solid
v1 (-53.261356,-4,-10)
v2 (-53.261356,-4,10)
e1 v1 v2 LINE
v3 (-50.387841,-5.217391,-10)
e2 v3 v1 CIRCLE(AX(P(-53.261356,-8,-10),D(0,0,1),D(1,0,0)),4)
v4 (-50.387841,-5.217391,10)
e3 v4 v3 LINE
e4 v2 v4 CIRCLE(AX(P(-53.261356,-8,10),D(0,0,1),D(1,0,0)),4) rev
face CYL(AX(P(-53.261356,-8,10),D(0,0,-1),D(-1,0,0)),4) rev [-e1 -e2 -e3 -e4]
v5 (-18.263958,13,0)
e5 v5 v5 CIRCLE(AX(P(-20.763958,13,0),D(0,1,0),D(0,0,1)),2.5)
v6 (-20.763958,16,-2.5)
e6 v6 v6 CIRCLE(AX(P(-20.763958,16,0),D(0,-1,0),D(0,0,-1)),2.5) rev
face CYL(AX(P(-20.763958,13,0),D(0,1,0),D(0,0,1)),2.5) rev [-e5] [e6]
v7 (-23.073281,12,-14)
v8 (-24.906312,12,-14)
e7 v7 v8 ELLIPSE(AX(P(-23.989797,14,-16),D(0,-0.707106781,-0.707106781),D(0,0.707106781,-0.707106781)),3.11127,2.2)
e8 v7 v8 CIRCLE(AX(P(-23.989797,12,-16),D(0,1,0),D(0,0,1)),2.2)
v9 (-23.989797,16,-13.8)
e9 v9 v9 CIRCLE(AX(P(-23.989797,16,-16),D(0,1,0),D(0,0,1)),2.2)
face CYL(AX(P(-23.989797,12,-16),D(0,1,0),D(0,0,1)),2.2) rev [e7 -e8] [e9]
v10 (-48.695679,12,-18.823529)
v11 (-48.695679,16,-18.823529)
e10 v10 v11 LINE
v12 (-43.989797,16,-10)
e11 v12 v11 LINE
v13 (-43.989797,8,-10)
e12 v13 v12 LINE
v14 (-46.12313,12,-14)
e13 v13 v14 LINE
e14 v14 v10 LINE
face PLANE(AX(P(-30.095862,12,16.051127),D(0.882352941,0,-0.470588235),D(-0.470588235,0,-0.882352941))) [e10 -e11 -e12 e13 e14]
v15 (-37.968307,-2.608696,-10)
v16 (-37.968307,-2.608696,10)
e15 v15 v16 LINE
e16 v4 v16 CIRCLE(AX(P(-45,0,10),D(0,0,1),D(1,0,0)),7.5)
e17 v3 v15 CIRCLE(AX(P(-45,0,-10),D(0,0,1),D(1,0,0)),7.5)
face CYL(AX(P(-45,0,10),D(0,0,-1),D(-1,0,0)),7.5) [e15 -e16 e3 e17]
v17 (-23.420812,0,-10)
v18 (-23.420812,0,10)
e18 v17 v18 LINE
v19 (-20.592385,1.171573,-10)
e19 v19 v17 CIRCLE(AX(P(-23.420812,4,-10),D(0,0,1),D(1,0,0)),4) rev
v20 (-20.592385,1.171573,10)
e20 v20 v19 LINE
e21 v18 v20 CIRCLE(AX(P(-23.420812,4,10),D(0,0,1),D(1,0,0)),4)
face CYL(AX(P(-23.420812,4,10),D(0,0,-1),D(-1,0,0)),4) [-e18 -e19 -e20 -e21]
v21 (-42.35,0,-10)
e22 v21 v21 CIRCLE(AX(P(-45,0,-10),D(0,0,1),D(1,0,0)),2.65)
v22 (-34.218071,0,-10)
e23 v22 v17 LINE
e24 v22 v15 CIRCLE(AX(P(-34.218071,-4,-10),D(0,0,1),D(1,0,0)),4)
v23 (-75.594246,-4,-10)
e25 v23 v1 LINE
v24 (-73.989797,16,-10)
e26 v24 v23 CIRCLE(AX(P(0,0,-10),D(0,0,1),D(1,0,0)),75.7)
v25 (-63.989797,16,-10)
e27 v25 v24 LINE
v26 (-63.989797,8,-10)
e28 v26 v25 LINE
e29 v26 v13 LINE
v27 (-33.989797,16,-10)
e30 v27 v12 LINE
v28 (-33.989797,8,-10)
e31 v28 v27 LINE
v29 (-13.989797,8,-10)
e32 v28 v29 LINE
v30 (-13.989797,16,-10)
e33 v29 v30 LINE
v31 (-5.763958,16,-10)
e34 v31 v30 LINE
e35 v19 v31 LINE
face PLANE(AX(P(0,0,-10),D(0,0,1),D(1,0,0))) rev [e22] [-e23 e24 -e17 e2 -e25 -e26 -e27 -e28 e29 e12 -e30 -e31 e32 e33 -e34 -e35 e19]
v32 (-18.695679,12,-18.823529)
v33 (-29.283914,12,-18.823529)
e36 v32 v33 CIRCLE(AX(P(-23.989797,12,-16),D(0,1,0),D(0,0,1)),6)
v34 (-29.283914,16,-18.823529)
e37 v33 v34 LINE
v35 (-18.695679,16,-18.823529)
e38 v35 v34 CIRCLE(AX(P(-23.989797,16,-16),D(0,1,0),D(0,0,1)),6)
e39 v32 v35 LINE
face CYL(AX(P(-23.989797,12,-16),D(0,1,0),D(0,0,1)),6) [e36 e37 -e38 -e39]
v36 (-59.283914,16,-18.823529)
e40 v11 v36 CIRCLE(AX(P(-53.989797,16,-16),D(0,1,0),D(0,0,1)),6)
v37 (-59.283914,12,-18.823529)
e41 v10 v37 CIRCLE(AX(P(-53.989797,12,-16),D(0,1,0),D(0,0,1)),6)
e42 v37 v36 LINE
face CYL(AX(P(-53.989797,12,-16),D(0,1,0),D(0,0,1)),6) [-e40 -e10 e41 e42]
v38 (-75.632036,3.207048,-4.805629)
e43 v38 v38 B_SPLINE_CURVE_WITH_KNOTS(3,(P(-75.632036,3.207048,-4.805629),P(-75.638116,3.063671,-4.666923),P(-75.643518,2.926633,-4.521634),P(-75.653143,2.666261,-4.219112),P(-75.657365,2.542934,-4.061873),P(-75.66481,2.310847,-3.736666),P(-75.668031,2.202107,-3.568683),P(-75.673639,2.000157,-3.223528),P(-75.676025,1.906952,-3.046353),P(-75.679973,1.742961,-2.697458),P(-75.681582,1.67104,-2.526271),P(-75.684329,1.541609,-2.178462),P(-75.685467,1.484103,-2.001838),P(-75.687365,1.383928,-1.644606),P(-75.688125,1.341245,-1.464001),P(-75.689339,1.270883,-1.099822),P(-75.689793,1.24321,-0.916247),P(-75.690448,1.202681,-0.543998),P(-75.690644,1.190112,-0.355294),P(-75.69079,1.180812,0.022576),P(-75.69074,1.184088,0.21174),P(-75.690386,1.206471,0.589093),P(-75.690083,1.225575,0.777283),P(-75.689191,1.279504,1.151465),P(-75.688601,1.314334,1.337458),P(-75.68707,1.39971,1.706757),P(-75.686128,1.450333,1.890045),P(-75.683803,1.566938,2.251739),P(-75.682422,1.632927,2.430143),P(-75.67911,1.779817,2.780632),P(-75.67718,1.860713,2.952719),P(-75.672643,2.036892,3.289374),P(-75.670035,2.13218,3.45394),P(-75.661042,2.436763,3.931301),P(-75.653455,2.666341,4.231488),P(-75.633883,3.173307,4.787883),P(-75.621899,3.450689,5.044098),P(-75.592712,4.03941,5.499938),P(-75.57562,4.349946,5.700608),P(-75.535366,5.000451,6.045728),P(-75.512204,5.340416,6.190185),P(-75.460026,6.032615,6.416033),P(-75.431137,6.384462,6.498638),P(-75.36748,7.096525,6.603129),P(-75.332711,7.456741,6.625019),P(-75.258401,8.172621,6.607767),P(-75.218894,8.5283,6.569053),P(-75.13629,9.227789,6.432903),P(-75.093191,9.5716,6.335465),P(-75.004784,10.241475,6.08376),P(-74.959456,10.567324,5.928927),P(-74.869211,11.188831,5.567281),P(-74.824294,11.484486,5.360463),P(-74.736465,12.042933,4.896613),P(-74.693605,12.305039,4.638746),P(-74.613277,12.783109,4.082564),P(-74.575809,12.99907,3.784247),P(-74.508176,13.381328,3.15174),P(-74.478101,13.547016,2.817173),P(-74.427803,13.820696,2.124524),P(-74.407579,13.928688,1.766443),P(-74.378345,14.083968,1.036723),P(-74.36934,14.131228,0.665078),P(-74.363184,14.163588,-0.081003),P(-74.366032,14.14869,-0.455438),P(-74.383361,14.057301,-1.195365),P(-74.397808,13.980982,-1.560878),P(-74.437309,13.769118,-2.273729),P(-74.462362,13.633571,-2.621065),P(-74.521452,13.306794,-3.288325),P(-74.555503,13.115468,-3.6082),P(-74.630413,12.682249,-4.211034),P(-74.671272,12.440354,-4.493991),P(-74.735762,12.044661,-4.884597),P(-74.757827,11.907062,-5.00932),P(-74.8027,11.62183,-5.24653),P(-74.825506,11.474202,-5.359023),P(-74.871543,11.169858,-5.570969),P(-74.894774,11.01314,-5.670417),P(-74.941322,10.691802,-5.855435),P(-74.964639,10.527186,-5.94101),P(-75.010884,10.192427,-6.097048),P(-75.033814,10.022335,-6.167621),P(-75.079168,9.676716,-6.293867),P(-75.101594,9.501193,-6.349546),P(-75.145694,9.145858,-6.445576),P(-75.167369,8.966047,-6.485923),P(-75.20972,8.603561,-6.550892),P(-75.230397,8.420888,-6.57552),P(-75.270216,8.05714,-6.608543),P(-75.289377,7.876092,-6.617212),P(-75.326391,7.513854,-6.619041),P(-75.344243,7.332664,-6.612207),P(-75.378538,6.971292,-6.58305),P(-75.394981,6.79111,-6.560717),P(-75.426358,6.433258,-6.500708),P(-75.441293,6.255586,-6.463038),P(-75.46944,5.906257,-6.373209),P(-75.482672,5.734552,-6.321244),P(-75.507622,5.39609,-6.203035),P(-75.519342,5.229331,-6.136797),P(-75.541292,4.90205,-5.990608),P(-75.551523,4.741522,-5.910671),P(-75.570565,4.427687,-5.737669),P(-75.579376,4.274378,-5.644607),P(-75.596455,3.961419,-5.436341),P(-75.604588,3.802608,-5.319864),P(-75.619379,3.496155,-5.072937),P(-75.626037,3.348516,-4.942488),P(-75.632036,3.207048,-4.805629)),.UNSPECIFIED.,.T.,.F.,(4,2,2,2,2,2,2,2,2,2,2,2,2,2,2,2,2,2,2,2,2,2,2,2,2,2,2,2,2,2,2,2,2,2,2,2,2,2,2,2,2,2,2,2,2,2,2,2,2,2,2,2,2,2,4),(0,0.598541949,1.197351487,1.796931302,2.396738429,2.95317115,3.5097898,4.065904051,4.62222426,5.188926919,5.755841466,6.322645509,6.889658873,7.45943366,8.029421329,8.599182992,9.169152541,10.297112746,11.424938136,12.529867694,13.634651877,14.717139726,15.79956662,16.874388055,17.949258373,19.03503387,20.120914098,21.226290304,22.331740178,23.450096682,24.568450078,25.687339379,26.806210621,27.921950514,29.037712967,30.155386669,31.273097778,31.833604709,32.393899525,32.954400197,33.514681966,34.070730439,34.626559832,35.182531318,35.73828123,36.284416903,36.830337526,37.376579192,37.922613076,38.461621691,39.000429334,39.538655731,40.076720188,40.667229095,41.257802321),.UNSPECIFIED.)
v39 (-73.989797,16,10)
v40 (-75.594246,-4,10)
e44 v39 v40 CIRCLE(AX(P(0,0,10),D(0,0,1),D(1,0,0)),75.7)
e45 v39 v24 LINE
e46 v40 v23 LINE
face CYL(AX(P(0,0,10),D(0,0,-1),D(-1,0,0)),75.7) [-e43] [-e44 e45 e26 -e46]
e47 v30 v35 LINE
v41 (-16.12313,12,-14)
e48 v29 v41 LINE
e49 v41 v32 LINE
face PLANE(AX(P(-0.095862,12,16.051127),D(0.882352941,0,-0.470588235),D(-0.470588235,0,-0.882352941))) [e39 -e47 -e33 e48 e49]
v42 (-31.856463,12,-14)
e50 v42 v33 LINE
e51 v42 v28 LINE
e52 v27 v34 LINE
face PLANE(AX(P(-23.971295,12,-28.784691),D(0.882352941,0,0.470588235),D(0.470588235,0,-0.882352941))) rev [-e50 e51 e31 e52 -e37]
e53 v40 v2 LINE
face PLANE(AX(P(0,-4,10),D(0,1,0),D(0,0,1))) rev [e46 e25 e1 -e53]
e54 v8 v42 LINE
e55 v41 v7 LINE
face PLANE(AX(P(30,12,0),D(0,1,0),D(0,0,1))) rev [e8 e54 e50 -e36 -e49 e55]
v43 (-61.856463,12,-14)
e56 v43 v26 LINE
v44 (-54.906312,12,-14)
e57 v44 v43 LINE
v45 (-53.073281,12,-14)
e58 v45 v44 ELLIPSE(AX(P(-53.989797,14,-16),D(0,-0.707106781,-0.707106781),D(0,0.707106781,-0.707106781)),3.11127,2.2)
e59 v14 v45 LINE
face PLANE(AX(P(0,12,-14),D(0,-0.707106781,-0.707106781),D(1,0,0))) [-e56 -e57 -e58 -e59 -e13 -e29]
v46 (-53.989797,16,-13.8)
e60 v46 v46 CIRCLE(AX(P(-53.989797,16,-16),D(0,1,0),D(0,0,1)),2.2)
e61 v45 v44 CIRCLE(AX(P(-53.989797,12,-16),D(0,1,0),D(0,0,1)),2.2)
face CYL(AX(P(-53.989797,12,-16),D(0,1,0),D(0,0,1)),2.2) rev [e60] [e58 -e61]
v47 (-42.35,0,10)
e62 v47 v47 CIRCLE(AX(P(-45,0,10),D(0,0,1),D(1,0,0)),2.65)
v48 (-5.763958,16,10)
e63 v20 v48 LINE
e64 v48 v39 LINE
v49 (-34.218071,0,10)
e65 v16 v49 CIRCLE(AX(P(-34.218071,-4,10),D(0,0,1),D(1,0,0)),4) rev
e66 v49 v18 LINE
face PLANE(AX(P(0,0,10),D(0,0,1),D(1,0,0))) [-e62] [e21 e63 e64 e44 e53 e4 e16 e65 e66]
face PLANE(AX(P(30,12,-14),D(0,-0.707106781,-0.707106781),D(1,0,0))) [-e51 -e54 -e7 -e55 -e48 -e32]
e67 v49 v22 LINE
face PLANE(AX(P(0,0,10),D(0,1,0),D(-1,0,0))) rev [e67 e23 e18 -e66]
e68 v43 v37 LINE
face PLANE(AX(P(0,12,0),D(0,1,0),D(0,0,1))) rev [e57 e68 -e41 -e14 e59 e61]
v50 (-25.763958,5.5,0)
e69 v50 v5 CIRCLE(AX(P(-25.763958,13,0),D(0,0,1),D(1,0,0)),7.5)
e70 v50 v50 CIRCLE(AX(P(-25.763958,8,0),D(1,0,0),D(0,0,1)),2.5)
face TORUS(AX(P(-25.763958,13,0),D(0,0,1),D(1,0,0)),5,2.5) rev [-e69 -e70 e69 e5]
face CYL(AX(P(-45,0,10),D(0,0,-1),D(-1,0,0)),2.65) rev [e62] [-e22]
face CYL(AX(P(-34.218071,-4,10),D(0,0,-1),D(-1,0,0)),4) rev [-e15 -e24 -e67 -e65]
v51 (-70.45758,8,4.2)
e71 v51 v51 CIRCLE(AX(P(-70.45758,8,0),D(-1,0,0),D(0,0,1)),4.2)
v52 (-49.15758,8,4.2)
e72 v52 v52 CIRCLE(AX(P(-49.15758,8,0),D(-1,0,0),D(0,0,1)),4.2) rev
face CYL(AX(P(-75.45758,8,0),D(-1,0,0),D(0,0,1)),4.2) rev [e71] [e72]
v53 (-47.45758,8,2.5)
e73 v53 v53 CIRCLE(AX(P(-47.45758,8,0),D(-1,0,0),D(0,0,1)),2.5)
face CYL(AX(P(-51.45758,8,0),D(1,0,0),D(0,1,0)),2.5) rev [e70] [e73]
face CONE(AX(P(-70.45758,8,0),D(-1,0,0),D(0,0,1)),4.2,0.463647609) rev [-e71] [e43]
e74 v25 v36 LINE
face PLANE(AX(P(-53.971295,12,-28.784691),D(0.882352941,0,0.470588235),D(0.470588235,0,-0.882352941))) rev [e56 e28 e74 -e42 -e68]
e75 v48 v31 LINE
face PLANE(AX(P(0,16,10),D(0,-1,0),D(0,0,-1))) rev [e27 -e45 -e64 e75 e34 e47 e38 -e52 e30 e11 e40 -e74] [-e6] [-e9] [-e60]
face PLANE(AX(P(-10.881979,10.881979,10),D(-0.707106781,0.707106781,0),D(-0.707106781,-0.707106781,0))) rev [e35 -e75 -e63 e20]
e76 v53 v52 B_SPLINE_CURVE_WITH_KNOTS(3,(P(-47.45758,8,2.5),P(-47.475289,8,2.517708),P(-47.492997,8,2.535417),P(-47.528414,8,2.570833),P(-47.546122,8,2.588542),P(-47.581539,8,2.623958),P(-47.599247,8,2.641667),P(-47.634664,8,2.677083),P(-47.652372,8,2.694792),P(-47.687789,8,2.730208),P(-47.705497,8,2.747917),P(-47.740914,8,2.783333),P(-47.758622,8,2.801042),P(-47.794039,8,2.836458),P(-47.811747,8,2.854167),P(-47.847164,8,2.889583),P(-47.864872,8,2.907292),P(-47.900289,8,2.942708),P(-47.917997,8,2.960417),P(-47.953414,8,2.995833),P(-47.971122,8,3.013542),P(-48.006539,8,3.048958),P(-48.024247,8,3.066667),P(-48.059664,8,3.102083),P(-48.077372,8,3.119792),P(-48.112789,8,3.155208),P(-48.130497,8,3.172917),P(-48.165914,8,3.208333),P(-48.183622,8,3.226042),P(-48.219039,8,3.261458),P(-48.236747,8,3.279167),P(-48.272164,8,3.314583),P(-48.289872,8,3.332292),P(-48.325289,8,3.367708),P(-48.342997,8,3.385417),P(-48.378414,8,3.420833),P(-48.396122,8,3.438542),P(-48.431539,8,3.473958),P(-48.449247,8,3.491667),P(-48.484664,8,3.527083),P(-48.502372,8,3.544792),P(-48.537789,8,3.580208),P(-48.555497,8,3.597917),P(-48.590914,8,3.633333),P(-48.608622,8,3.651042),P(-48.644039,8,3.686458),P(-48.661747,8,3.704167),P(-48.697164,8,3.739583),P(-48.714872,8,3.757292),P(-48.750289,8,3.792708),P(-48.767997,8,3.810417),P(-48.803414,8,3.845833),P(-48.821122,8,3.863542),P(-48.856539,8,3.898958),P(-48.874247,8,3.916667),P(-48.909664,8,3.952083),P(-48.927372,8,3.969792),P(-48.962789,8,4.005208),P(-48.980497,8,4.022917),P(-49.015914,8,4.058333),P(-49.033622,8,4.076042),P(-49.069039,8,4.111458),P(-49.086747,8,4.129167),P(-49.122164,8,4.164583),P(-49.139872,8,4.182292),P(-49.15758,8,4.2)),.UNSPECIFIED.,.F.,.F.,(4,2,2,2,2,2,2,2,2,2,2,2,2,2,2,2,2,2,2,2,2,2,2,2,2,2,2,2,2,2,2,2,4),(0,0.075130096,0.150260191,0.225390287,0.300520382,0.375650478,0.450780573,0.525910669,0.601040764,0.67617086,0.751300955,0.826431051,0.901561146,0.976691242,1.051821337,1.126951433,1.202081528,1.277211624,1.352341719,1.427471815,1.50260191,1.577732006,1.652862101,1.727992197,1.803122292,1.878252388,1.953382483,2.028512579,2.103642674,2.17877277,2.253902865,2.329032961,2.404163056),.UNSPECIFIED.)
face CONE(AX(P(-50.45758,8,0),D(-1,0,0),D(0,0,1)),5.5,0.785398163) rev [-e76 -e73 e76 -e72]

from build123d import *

# Parameters (mm, degrees)
SKETCH2_R           = 2.65
BOSS_EXTRUDE1_DEPTH = 10
SKETCH5_R           = 2.5
CHAMFER1_SIZE       = 3
FILLET4_R           = 4
SKETCH9_R           = 6
SKETCH9_R_2         = 2.2
BOSS_EXTRUDE2_DEPTH = 4
LPATTERN1_COUNT     = 2
LPATTERN1_PITCH     = 30
CHAMFER2_SIZE       = 4


with BuildPart() as part:
    # Sketch2 → Boss-Extrude1 (new, symmetric)
    with BuildSketch(Plane.XY):
        with BuildLine():
            ThreePointArc((-73.989796594, 16), (-75.457580373, 6.053392794), (-75.594245813, -4))
            Line((-75.594245813, -4), (-51.34428877, -4))
            ThreePointArc((-51.34428877, -4), (-42.918193786, -7.205281597), (-37.5, 0))
            Line((-37.5, 0), (-21.763957799, 0))
            Line((-21.763957799, 0), (-5.763957799, 16))
            Line((-5.763957799, 16), (-73.989796594, 16))
        make_face()
        with Locations((-45, 0)):
            Circle(SKETCH2_R, mode=Mode.SUBTRACT)
    extrude(amount=BOSS_EXTRUDE1_DEPTH, both=True)

    # Sketch3 → Cut-Revolve1 (revolve, cut)
    with BuildSketch(Plane.XY, mode=Mode.PRIVATE) as cut_revolve1_sk:
        Polygon((-76.457580373, 8), (-75.457580373, 8), (-50.457580373, 8), (-50.457580373, 12.2), (-70.457580373, 12.2), (-76.457580373, 12.2), align=None)
        Polygon((-76.457580373, 15.2), (-76.457580373, 12.2), (-70.457580373, 12.2), align=None)
    revolve(cut_revolve1_sk.sketch.rotate(Axis((-75.457580373, 8, 0), (1, 0, 0)), 90), axis=Axis((-75.457580373, 8, 0), (1, 0, 0)), mode=Mode.SUBTRACT)

    # Cut-Sweep2: sweep along a path in Sketch7
    with BuildLine(Plane.XY) as cut_sweep2_path:
        Line((-50.457580373, 8), (-25.763957799, 8))
        ThreePointArc((-25.763957799, 8), (-22.228423893, 9.464466094), (-20.763957799, 13))
        Line((-20.763957799, 13), (-20.763957799, 16))
    # Sketch5 → Cut-Sweep2 (sweep, cut)
    with BuildSketch(Plane(origin=(0, 16, 0), x_dir=(1, 0, 0), z_dir=(0, 1, 0))):
        with Locations((-20.763957799, 0)):
            Circle(SKETCH5_R)
    sweep(path=cut_sweep2_path.line, mode=Mode.SUBTRACT)

    # Chamfer1
    # the kernel refuses this chamfer: 3 mm, written as the material it takes off along each edge
    with BuildSketch(Plane(origin=(-50.457580373, 8, 0), x_dir=(0, -1, 0), z_dir=(0, 0, 1))) as chamfer1_piece_1_section:
        Polygon((2.5 + CHAMFER1_SIZE, 0), (2.5, CHAMFER1_SIZE), (2.5, 0), align=None)
    chamfer1_piece_1 = revolve(axis=Axis((-50.457580373, 8, 0), (1, 0, 0)), mode=Mode.PRIVATE)
    chamfer1_piece_1 = chamfer1_piece_1 & Plane(origin=(-48.295596493, 8, 0), x_dir=(0, 0, 1), z_dir=(-1, 0, 0)) * Cylinder(4.2, 22, mode=Mode.PRIVATE)
    add(chamfer1_piece_1, mode=Mode.SUBTRACT)

    # Fillet4
    fillet4_edges = [part.edges().sort_by_distance(p)[0] for p in [
        (-21.763957799, 0, 0),
        (-37.5, 0, 0),
        (-51.34428877, -4, 0),
    ]]
    fillet(fillet4_edges, radius=FILLET4_R)

    # Sketch9 → Boss-Extrude2 (add)
    # profile 1 of 3: a face of its own
    with BuildSketch(Plane(origin=(0, 16, 0), x_dir=(1, 0, 0), z_dir=(0, 1, 0))):
        with Locations((-53.989796594, 16)):
            Circle(SKETCH9_R)
        with Locations(Location((-53.989796594, 16, 0), (0, 0, 270))):
            Circle(SKETCH9_R_2, mode=Mode.SUBTRACT)
    # profile 2 of 3: a face of its own
    with BuildSketch(Plane(origin=(0, 16, 0), x_dir=(1, 0, 0), z_dir=(0, 1, 0))):
        with BuildLine():
            ThreePointArc((-47.989796594, 16), (-49.747155907, 11.757359313), (-53.989796594, 10))
            Line((-53.989796594, 10), (-43.989796594, 10))
            Line((-43.989796594, 10), (-48.695678947, 18.823529412))
            ThreePointArc((-48.695678947, 18.823529412), (-48.168941593, 17.45521375), (-47.989796594, 16))
        make_face()
    # profile 3 of 3: a face of its own
    with BuildSketch(Plane(origin=(0, 16, 0), x_dir=(1, 0, 0), z_dir=(0, 1, 0))):
        with BuildLine():
            Line((-59.283914241, 18.823529412), (-63.989796594, 10))
            Line((-63.989796594, 10), (-53.989796594, 10))
            ThreePointArc((-53.989796594, 10), (-59.134754148, 12.913025467), (-59.283914241, 18.823529412))
        make_face()
    boss_extrude2 = extrude(amount=-BOSS_EXTRUDE2_DEPTH)

    # LPattern1: Boss-Extrude2 ×2
    with Locations(*[(i * LPATTERN1_PITCH, 0, 0) for i in range(1, LPATTERN1_COUNT)]):
        add(boss_extrude2)

    # Chamfer2
    # the kernel refuses this chamfer: 4 mm, written as the material it adds along each edge
    with BuildSketch(Plane(origin=(-33.703064642, 12, -10), x_dir=(0, -0.9996219169112968, 0.027495876610586494), z_dir=(-1, 0, 0))) as chamfer2_piece_1_section:
        Polygon((CHAMFER2_SIZE * 0.999621916911, -CHAMFER2_SIZE * 0.0274958766106), (-CHAMFER2_SIZE * 0.0274958766106, -CHAMFER2_SIZE * 0.999621916911), (0, 0), align=None)
    chamfer2_piece_1 = extrude(amount=40.573463904, mode=Mode.PRIVATE)
    chamfer2_piece_1 = split(chamfer2_piece_1, bisect_by=Plane(origin=(-33.908180605, 9.955648468, -10.153029979), z_dir=(0.882352941176471, 0, 0.4705882352941171)), keep=Keep.TOP, mode=Mode.PRIVATE)
    add(chamfer2_piece_1)
    with BuildSketch(Plane(origin=(-33.703064642, 12, -10), x_dir=(0, -0.9996219169112968, 0.027495876610586494), z_dir=(-1, 0, 0))) as chamfer2_piece_2_section:
        Polygon((CHAMFER2_SIZE * 0.999621916911, -CHAMFER2_SIZE * 0.0274958766106), (-CHAMFER2_SIZE * 0.0274958766106, -CHAMFER2_SIZE * 0.999621916911), (0, 0), align=None)
    chamfer2_piece_2 = extrude(amount=40.573463904, mode=Mode.PRIVATE)
    chamfer2_piece_2 = split(chamfer2_piece_2, bisect_by=Plane(origin=(-61.252355545, 10.648848957, -15.132701966), z_dir=(0.882352941176471, 0, 0.4705882352941171)), keep=Keep.TOP, mode=Mode.PRIVATE)
    chamfer2_piece_2 = split(chamfer2_piece_2, bisect_by=Plane(origin=(-46.727237643, 10.648848957, -15.132701966), z_dir=(-0.8823529411764707, 0, 0.4705882352941174)), keep=Keep.TOP, mode=Mode.PRIVATE)
    chamfer2_piece_2 = chamfer2_piece_2 - Plane(origin=(-53.989796594, 10.648848957, -16), x_dir=(0, 0, 1), z_dir=(0, 1, 0)) * Cylinder(2.2, 98, mode=Mode.PRIVATE)
    add(chamfer2_piece_2)
    with BuildSketch(Plane(origin=(-3.703064642, 12, -10), x_dir=(0, -0.9996219169112968, 0.027495876610586494), z_dir=(-1, 0, 0))) as chamfer2_piece_3_section:
        Polygon((CHAMFER2_SIZE * 0.999621916911, -CHAMFER2_SIZE * 0.0274958766106), (-CHAMFER2_SIZE * 0.0274958766106, -CHAMFER2_SIZE * 0.999621916911), (0, 0), align=None)
    chamfer2_piece_3 = extrude(amount=40.573463904, mode=Mode.PRIVATE)
    chamfer2_piece_3 = split(chamfer2_piece_3, bisect_by=Plane(origin=(-31.252355545, 10.648848957, -15.132701966), z_dir=(0.882352941176471, 0, 0.4705882352941171)), keep=Keep.TOP, mode=Mode.PRIVATE)
    chamfer2_piece_3 = split(chamfer2_piece_3, bisect_by=Plane(origin=(-16.727237643, 10.648848957, -15.132701966), z_dir=(-0.8823529411764707, 0, 0.4705882352941174)), keep=Keep.TOP, mode=Mode.PRIVATE)
    chamfer2_piece_3 = chamfer2_piece_3 - Plane(origin=(-23.989796594, 10.648848957, -16), x_dir=(0, 0, 1), z_dir=(0, 1, 0)) * Cylinder(2.2, 98, mode=Mode.PRIVATE)
    add(chamfer2_piece_3)
    with BuildSketch(Plane(origin=(-3.703064642, 12, -10), x_dir=(0, -0.9996219169112968, 0.027495876610586494), z_dir=(-1, 0, 0))) as chamfer2_piece_4_section:
        Polygon((CHAMFER2_SIZE * 0.999621916911, -CHAMFER2_SIZE * 0.0274958766106), (-CHAMFER2_SIZE * 0.0274958766106, -CHAMFER2_SIZE * 0.999621916911), (0, 0), align=None)
    chamfer2_piece_4 = extrude(amount=40.573463904, mode=Mode.PRIVATE)
    chamfer2_piece_4 = split(chamfer2_piece_4, bisect_by=Plane(origin=(-44.071412583, 9.955648468, -10.153029979), z_dir=(-0.8823529411764707, 0, 0.4705882352941174)), keep=Keep.TOP, mode=Mode.PRIVATE)
    add(chamfer2_piece_4)


solid = part.part
